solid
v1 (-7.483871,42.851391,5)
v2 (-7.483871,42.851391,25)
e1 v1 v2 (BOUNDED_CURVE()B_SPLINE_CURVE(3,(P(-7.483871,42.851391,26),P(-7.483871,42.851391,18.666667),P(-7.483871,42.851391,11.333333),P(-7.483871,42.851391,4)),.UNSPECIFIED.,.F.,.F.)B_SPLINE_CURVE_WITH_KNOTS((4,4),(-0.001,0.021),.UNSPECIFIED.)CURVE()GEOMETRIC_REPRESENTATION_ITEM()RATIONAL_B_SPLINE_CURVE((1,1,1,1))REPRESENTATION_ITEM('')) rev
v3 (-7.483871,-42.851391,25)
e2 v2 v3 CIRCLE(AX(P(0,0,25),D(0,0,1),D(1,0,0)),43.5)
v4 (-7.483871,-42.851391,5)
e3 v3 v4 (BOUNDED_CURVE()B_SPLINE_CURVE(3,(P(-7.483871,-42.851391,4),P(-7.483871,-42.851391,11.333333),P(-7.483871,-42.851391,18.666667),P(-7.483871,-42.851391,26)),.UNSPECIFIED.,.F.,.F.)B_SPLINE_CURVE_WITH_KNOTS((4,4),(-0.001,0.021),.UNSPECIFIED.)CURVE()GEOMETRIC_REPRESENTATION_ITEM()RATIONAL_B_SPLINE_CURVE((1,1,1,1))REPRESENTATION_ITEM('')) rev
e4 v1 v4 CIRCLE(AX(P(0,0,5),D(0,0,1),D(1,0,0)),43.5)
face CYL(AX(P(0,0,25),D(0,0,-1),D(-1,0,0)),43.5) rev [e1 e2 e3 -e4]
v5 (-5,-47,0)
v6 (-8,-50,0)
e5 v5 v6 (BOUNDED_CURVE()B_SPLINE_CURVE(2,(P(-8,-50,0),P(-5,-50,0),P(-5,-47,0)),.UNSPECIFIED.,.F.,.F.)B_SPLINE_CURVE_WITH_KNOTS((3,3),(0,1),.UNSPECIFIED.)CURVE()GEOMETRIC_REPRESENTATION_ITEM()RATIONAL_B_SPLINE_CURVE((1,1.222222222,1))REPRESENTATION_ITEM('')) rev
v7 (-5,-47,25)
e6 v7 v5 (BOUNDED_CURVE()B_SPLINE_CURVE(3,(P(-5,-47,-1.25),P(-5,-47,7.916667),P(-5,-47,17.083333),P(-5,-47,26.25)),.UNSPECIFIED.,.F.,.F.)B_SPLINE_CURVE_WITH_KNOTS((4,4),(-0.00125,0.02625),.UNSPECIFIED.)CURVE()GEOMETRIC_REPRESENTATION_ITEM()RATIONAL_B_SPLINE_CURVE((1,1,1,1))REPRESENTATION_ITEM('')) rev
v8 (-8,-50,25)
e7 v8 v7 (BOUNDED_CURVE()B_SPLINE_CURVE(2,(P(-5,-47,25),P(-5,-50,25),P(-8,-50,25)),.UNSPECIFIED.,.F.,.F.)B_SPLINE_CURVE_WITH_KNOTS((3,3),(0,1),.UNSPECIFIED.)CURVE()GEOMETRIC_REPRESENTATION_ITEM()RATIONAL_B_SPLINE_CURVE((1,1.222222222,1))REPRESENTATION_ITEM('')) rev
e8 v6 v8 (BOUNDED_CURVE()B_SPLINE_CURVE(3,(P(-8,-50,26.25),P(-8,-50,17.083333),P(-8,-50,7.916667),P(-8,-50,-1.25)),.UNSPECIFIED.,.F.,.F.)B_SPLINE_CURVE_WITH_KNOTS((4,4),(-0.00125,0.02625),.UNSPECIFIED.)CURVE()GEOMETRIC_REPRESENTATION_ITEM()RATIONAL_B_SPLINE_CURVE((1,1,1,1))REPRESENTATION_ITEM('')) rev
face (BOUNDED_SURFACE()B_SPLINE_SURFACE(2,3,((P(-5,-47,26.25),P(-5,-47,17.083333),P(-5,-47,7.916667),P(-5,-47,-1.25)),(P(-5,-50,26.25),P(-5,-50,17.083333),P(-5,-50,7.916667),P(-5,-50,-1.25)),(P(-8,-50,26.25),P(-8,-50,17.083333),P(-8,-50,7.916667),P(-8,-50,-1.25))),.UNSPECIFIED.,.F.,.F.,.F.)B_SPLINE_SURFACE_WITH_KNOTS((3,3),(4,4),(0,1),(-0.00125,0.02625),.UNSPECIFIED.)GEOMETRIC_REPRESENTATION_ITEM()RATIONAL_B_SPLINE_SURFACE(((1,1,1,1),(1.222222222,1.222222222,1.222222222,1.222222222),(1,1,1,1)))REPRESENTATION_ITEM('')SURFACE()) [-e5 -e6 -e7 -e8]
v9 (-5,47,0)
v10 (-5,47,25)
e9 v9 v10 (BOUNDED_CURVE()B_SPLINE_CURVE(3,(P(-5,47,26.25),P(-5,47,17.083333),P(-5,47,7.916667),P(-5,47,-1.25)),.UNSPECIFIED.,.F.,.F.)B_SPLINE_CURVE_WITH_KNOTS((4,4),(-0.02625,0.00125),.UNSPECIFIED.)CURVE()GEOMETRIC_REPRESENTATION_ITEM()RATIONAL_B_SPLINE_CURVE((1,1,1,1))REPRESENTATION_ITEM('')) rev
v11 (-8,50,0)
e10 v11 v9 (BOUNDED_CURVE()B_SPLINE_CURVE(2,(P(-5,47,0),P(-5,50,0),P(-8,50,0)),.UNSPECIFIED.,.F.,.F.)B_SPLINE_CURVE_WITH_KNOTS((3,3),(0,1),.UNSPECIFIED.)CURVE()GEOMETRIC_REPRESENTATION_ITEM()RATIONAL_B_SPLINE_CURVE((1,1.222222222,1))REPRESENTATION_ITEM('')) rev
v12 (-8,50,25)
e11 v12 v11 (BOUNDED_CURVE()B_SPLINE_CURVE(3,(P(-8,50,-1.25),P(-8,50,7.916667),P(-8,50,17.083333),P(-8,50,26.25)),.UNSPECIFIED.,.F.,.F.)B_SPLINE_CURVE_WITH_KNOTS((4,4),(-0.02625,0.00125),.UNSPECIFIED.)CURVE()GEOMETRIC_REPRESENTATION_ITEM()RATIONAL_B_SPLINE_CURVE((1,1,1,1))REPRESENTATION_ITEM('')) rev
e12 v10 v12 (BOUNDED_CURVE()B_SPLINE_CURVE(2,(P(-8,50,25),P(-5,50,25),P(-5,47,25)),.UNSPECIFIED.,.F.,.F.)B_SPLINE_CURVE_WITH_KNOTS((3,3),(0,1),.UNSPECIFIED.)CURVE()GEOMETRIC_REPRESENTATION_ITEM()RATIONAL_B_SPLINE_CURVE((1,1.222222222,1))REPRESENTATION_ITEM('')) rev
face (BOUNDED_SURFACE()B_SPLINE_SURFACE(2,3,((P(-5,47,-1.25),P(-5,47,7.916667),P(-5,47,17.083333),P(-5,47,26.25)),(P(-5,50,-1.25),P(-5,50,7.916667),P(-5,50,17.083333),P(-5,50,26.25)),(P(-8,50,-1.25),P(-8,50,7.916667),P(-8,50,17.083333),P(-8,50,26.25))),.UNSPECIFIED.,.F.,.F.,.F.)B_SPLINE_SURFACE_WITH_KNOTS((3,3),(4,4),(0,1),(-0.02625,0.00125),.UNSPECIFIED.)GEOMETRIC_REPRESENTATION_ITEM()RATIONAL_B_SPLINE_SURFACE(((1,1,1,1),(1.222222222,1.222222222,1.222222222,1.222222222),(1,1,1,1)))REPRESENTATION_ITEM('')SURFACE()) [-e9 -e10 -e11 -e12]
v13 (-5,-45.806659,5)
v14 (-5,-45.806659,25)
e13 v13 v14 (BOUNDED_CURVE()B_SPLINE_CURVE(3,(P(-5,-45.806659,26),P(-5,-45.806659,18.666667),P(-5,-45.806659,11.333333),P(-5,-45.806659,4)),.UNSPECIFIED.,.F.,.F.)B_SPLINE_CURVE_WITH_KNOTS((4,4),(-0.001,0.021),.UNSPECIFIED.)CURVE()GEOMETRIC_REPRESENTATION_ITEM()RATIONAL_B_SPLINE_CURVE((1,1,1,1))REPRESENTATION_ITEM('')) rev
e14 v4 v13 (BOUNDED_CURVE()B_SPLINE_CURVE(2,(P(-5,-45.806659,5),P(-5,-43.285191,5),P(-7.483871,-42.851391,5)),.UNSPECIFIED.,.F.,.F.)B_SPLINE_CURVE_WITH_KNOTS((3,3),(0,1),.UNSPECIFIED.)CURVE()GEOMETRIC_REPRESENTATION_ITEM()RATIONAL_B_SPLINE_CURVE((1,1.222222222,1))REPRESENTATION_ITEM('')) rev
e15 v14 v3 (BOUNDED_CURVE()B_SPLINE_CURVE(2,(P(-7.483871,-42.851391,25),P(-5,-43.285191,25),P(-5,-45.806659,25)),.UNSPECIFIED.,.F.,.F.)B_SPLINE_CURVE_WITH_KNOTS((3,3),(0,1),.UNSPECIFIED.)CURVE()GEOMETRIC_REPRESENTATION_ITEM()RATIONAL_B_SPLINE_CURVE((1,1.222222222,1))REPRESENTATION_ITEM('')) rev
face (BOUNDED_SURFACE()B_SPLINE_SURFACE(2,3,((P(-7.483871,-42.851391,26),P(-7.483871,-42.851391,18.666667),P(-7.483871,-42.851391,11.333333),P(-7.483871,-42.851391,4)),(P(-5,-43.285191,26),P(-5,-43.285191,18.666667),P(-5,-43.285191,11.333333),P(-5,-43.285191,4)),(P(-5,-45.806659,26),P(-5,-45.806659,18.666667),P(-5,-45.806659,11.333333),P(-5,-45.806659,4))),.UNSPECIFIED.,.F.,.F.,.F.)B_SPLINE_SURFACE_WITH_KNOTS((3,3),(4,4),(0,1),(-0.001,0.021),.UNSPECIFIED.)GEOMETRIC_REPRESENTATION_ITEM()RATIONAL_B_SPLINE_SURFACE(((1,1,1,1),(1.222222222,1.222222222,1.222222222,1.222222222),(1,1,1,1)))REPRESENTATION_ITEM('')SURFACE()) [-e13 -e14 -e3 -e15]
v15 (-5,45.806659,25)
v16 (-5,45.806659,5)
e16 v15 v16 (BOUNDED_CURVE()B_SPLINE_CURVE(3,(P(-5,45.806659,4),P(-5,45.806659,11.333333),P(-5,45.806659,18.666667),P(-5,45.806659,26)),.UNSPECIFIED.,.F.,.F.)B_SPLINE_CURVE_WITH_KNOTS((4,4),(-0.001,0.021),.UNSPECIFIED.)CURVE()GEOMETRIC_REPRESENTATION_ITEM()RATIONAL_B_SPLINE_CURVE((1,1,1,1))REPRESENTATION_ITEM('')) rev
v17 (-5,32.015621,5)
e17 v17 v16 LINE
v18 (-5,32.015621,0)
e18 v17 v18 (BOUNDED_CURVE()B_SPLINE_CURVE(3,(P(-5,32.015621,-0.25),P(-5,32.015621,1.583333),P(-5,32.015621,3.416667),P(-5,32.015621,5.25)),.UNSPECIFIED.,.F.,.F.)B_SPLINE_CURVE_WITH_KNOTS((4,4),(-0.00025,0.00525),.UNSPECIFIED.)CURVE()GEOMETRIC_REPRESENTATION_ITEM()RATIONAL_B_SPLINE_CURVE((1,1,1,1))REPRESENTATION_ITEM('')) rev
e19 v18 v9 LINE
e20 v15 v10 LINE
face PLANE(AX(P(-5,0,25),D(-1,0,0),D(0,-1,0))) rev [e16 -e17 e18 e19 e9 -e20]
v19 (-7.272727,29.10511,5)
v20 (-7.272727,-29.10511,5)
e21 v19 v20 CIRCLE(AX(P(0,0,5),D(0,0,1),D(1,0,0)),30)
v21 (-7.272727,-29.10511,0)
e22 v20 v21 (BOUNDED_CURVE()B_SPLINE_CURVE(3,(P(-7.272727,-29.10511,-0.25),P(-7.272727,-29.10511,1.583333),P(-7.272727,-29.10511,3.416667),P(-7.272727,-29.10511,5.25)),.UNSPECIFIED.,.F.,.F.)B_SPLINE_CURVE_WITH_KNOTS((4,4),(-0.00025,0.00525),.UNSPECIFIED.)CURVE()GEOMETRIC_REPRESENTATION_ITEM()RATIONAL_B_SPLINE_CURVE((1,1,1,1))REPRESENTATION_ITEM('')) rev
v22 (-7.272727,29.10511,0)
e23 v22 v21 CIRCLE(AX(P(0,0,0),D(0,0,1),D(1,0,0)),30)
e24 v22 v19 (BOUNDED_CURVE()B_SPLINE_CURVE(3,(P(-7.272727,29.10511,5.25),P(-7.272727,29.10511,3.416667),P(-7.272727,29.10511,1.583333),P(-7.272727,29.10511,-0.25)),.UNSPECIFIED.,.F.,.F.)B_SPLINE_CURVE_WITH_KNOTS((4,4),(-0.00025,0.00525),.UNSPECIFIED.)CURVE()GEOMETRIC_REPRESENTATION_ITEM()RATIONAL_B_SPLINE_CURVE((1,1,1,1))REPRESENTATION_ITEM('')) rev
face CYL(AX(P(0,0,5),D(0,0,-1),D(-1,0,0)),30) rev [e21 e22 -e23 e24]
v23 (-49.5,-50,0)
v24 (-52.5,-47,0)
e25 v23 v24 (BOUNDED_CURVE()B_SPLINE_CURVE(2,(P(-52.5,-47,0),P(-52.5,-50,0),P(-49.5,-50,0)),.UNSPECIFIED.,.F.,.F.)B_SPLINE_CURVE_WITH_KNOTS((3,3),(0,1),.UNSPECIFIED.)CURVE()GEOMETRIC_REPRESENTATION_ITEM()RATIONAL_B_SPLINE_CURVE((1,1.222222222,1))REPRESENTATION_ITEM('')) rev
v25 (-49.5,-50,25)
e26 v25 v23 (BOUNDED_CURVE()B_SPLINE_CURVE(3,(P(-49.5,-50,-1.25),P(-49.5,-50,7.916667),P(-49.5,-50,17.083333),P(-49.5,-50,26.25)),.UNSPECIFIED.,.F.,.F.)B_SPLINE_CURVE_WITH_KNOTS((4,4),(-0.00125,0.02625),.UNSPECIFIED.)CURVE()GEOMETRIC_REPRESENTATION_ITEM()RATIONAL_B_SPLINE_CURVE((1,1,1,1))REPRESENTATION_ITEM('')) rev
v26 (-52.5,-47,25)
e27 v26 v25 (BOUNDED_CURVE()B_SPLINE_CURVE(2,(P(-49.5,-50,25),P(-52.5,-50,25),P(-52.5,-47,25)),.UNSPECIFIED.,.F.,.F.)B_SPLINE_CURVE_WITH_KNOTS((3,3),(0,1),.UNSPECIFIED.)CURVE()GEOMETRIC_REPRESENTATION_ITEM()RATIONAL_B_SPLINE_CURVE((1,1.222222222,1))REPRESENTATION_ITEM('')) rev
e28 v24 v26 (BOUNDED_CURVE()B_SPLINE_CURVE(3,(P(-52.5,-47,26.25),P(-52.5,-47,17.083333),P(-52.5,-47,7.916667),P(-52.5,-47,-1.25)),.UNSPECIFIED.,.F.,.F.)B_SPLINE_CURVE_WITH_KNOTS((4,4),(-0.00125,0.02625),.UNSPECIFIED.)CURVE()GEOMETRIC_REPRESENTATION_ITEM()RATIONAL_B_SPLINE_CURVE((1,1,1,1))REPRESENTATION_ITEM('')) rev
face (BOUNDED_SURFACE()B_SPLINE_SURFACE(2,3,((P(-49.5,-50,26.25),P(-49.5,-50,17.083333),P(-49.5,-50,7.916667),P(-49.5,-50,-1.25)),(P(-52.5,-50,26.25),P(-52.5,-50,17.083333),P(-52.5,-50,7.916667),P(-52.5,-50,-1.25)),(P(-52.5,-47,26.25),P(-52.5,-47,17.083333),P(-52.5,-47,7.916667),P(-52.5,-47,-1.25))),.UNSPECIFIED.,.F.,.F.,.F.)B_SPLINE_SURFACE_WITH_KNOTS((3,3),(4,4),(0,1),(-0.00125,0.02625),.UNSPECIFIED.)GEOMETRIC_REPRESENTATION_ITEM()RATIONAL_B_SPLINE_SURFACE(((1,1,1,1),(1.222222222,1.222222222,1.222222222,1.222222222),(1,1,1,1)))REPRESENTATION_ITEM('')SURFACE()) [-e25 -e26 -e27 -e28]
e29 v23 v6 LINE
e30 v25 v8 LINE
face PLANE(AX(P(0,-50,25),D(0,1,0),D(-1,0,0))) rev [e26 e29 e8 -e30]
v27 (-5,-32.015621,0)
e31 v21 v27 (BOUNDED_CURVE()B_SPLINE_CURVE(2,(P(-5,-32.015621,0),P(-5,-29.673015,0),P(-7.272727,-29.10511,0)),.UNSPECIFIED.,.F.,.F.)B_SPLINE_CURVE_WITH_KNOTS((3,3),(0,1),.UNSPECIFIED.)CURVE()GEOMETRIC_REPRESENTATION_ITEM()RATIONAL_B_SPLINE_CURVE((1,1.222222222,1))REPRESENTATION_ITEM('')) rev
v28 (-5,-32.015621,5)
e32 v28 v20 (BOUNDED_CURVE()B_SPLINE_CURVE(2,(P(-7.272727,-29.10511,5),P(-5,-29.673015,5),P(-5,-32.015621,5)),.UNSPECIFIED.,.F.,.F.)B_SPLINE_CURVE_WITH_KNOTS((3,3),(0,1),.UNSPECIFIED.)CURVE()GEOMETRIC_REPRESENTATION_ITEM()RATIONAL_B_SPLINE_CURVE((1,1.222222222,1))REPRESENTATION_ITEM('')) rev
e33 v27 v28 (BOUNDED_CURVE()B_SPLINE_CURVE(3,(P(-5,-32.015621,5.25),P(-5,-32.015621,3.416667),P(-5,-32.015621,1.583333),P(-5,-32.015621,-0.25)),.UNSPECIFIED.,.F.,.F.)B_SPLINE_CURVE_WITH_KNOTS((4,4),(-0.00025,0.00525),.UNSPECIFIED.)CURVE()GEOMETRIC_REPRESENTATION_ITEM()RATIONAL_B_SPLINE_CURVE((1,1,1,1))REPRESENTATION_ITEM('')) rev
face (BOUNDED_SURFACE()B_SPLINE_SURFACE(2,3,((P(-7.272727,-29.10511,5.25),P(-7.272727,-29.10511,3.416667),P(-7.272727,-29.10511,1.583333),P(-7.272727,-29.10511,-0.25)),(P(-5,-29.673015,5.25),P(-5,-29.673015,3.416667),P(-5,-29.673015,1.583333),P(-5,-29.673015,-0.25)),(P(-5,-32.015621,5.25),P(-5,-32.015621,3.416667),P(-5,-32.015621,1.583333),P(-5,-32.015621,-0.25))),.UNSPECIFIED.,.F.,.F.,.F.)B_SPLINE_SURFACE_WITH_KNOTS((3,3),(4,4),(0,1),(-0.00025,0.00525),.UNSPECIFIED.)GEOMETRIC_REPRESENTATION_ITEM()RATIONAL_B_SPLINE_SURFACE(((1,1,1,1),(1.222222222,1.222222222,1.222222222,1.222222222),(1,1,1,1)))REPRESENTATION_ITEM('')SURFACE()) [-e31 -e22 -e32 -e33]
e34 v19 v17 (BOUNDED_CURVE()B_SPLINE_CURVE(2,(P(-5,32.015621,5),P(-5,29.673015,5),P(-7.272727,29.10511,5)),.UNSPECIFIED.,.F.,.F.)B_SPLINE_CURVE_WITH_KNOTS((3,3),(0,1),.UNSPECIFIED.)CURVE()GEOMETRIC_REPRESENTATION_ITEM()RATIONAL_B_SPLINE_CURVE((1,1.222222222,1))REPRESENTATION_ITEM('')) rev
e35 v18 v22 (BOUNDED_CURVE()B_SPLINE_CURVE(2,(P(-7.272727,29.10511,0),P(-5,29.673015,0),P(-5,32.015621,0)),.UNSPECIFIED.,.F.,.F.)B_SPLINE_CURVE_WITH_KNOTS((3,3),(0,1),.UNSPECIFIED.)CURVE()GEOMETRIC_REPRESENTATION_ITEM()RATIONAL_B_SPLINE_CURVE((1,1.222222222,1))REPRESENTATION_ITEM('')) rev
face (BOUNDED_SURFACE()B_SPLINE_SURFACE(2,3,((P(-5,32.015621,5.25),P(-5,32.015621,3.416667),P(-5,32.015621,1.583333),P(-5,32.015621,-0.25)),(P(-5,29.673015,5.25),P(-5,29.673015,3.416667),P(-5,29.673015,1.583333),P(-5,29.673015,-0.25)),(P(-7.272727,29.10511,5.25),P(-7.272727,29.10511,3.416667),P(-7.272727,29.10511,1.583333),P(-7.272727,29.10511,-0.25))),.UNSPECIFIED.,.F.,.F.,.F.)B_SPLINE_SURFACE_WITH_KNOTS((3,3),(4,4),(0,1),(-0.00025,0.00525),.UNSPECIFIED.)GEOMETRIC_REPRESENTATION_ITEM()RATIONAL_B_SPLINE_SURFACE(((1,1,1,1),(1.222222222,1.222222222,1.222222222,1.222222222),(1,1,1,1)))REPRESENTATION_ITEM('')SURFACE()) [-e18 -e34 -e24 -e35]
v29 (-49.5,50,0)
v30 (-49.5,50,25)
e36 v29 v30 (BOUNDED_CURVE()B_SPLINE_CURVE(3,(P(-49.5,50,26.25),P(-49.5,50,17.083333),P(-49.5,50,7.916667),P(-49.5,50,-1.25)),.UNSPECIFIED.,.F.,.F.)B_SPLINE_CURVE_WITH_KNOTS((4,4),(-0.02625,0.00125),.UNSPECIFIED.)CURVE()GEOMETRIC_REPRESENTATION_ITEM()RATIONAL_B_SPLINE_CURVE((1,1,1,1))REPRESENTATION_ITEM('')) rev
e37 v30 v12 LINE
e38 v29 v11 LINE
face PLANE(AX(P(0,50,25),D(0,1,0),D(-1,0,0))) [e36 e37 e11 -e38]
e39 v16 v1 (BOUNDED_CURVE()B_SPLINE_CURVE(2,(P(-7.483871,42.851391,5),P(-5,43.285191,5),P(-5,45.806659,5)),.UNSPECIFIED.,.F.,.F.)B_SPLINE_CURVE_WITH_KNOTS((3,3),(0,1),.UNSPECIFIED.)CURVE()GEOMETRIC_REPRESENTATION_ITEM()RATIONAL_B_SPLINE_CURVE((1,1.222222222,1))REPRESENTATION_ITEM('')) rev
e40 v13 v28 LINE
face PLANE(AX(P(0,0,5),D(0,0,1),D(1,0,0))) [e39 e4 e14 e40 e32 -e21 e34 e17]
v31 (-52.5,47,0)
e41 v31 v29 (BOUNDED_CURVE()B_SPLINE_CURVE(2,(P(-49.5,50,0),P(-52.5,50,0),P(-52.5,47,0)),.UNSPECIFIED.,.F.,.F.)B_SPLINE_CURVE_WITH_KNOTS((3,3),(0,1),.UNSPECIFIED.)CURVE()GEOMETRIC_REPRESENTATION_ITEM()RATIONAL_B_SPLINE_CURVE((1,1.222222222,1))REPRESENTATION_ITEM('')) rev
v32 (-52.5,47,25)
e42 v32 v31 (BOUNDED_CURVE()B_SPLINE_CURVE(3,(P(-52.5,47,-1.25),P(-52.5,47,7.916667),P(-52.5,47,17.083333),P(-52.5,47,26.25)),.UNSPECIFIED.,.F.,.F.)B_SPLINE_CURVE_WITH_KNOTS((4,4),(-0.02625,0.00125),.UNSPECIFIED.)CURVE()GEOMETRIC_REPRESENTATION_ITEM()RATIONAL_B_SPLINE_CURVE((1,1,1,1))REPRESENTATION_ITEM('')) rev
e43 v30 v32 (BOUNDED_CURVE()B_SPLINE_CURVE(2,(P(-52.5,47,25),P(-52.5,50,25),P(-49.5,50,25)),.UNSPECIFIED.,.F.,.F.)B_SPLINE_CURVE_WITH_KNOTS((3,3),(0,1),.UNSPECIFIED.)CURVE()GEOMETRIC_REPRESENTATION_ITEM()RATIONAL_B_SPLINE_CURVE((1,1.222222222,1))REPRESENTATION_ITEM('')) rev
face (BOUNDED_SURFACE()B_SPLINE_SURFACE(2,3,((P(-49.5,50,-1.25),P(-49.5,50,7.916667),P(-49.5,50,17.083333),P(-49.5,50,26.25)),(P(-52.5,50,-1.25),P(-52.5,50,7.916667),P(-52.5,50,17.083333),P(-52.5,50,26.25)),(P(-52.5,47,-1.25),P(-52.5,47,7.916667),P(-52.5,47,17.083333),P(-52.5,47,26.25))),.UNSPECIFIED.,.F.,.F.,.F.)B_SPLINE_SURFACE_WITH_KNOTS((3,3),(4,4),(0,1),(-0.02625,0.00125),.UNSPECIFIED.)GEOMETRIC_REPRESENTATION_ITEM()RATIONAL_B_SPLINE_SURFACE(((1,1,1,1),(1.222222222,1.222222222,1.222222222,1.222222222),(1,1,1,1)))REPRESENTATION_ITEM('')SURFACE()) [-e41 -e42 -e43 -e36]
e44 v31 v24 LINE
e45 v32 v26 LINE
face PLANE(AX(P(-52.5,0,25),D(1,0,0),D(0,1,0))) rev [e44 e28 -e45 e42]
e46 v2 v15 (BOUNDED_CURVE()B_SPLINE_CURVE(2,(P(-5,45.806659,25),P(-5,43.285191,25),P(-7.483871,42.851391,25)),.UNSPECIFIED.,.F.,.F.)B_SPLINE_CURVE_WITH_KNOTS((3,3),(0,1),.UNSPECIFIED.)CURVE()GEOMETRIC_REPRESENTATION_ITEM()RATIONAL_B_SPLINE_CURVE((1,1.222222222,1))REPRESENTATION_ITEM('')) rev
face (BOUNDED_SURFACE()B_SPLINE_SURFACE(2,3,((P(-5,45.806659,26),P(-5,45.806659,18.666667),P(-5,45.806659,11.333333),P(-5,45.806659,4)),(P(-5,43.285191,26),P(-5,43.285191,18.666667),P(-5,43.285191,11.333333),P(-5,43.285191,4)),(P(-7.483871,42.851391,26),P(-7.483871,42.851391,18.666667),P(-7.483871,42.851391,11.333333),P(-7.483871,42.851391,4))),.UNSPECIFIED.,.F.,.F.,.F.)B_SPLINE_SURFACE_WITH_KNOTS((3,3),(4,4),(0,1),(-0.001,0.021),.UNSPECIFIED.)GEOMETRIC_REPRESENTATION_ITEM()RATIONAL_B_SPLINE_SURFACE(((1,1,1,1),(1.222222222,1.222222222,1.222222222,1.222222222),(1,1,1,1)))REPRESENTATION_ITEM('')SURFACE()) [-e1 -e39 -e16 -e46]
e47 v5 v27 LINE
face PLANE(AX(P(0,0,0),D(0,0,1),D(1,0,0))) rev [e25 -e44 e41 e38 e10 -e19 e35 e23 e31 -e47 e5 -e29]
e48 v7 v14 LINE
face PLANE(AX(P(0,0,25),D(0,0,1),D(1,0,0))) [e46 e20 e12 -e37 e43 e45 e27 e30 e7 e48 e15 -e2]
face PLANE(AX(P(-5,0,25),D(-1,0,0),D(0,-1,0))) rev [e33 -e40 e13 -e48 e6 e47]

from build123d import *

# Parameters (mm, degrees)
BOSS_EXTRUDE1_DEPTH = 25
BOSS_EXTRUDE2_DEPTH = 5
FILLET1_SIZE        = 3


with BuildPart() as part:
    # Sketch1 → Boss-Extrude1 (new body)
    with BuildSketch(Plane.XY):
        with BuildLine():
            Line((-5, 50), (-52.5, 50))
            Line((-52.5, 50), (-52.5, -50))
            Line((-52.5, -50), (-5, -50))
            Line((-5, -50), (-5, -43.211688234))
            ThreePointArc((-5, -43.211688234), (-43.5, 0), (-5, 43.211688234))
            Line((-5, 43.211688234), (-5, 50))
        make_face()
    extrude(amount=BOSS_EXTRUDE1_DEPTH)

    # Sketch1<3> → Boss-Extrude2 (add)
    with BuildSketch(Plane.XY):
        with BuildLine():
            Line((-5, 29.580398915), (-5, 43.211688234))
            ThreePointArc((-5, 43.211688234), (-43.5, 0), (-5, -43.211688234))
            Line((-5, -43.211688234), (-5, -29.580398915))
            ThreePointArc((-5, -29.580398915), (-30, 0), (-5, 29.580398915))
        make_face()
    extrude(amount=BOSS_EXTRUDE2_DEPTH)

    # Fillet1
    # a fillet whose section is not a circle: 3 mm, written as the material it takes off along each edge
    with BuildSketch(Plane(origin=(-52.5, -50, -7.5), x_dir=(1, 0, 0), z_dir=(0, 0, 1)), Plane(origin=(-52.5, 50, -7.5), x_dir=(0, -1, 0), z_dir=(0, 0, 1)), Plane(origin=(-5, -50, -7.5), x_dir=(0, 1, 0), z_dir=(0, 0, 1))) as fillet1_piece_1:
        with BuildLine():
            Bezier((FILLET1_SIZE, 0), (0, 0), (0, FILLET1_SIZE), weights=[1, 1.222222222, 1])
            Line((0, FILLET1_SIZE), (0, 0))
            Line((0, 0), (FILLET1_SIZE, 0))
        make_face()
    extrude(amount=40, mode=Mode.SUBTRACT)
    with BuildSketch(Plane(origin=(-5, 50, -7.5), x_dir=(0, -1, 0), z_dir=(0, 0, 1))) as fillet1_piece_2:
        with BuildLine():
            Bezier((FILLET1_SIZE, 0), (0, 0), (0, -FILLET1_SIZE), weights=[1, 1.222222222, 1])
            Line((0, -FILLET1_SIZE), (0, 0))
            Line((0, 0), (FILLET1_SIZE, 0))
        make_face()
    extrude(amount=40, mode=Mode.SUBTRACT)
    with BuildSketch(Plane(origin=(-5, 43.211688234, 5), x_dir=(0, 1, 0), z_dir=(0, 0, 1))) as fillet1_piece_3:
        with BuildLine():
            Bezier((2.594970671, 0), (0.073503208, 0), (-0.360297645, 2.483870968), weights=[1, 1.222222222, 1])
            ThreePointArc((-0.360297645, 2.483870968), (-0.162230771, 1.244534585), (0, 0))
            Line((0, 0), (2.594970671, 0))
        make_face()
    extrude(amount=26.487426677, mode=Mode.SUBTRACT)
    with BuildSketch(Plane(origin=(-5, -43.211688234, 5), x_dir=(0, -1, 0), z_dir=(0, 0, 1))) as fillet1_piece_4:
        with BuildLine():
            Bezier((2.594970671, 0), (0.073503208, 0), (-0.360297645, -2.483870968), weights=[1, 1.222222222, 1])
            ThreePointArc((-0.360297645, -2.483870968), (-0.162230771, -1.244534585), (0, 0))
            Line((0, 0), (2.594970671, 0))
        make_face()
    extrude(amount=26.487426677, mode=Mode.SUBTRACT)
    with BuildSketch(Plane(origin=(-5, 29.580398915, -6.088055679), x_dir=(0, 1, 0), z_dir=(0, 0, 1))) as fillet1_piece_5:
        with BuildLine():
            Bezier((2.435222272, 0), (0.092615843, 0), (-0.475288745, 2.272727273), weights=[1, 1.222222222, 1])
            ThreePointArc((-0.475288745, 2.272727273), (-0.215648508, 1.140963567), (0, 0))
            Line((0, 0), (2.435222272, 0))
        make_face()
    extrude(amount=17.176111358, mode=Mode.SUBTRACT)
    with BuildSketch(Plane(origin=(-5, -29.580398915, -6.088055679), x_dir=(0, -1, 0), z_dir=(0, 0, 1))) as fillet1_piece_6:
        with BuildLine():
            Bezier((2.435222272, 0), (0.092615843, 0), (-0.475288745, -2.272727273), weights=[1, 1.222222222, 1])
            ThreePointArc((-0.475288745, -2.272727273), (-0.215648508, -1.140963567), (0, 0))
            Line((0, 0), (2.435222272, 0))
        make_face()
    extrude(amount=17.176111358, mode=Mode.SUBTRACT)


solid = part.part
